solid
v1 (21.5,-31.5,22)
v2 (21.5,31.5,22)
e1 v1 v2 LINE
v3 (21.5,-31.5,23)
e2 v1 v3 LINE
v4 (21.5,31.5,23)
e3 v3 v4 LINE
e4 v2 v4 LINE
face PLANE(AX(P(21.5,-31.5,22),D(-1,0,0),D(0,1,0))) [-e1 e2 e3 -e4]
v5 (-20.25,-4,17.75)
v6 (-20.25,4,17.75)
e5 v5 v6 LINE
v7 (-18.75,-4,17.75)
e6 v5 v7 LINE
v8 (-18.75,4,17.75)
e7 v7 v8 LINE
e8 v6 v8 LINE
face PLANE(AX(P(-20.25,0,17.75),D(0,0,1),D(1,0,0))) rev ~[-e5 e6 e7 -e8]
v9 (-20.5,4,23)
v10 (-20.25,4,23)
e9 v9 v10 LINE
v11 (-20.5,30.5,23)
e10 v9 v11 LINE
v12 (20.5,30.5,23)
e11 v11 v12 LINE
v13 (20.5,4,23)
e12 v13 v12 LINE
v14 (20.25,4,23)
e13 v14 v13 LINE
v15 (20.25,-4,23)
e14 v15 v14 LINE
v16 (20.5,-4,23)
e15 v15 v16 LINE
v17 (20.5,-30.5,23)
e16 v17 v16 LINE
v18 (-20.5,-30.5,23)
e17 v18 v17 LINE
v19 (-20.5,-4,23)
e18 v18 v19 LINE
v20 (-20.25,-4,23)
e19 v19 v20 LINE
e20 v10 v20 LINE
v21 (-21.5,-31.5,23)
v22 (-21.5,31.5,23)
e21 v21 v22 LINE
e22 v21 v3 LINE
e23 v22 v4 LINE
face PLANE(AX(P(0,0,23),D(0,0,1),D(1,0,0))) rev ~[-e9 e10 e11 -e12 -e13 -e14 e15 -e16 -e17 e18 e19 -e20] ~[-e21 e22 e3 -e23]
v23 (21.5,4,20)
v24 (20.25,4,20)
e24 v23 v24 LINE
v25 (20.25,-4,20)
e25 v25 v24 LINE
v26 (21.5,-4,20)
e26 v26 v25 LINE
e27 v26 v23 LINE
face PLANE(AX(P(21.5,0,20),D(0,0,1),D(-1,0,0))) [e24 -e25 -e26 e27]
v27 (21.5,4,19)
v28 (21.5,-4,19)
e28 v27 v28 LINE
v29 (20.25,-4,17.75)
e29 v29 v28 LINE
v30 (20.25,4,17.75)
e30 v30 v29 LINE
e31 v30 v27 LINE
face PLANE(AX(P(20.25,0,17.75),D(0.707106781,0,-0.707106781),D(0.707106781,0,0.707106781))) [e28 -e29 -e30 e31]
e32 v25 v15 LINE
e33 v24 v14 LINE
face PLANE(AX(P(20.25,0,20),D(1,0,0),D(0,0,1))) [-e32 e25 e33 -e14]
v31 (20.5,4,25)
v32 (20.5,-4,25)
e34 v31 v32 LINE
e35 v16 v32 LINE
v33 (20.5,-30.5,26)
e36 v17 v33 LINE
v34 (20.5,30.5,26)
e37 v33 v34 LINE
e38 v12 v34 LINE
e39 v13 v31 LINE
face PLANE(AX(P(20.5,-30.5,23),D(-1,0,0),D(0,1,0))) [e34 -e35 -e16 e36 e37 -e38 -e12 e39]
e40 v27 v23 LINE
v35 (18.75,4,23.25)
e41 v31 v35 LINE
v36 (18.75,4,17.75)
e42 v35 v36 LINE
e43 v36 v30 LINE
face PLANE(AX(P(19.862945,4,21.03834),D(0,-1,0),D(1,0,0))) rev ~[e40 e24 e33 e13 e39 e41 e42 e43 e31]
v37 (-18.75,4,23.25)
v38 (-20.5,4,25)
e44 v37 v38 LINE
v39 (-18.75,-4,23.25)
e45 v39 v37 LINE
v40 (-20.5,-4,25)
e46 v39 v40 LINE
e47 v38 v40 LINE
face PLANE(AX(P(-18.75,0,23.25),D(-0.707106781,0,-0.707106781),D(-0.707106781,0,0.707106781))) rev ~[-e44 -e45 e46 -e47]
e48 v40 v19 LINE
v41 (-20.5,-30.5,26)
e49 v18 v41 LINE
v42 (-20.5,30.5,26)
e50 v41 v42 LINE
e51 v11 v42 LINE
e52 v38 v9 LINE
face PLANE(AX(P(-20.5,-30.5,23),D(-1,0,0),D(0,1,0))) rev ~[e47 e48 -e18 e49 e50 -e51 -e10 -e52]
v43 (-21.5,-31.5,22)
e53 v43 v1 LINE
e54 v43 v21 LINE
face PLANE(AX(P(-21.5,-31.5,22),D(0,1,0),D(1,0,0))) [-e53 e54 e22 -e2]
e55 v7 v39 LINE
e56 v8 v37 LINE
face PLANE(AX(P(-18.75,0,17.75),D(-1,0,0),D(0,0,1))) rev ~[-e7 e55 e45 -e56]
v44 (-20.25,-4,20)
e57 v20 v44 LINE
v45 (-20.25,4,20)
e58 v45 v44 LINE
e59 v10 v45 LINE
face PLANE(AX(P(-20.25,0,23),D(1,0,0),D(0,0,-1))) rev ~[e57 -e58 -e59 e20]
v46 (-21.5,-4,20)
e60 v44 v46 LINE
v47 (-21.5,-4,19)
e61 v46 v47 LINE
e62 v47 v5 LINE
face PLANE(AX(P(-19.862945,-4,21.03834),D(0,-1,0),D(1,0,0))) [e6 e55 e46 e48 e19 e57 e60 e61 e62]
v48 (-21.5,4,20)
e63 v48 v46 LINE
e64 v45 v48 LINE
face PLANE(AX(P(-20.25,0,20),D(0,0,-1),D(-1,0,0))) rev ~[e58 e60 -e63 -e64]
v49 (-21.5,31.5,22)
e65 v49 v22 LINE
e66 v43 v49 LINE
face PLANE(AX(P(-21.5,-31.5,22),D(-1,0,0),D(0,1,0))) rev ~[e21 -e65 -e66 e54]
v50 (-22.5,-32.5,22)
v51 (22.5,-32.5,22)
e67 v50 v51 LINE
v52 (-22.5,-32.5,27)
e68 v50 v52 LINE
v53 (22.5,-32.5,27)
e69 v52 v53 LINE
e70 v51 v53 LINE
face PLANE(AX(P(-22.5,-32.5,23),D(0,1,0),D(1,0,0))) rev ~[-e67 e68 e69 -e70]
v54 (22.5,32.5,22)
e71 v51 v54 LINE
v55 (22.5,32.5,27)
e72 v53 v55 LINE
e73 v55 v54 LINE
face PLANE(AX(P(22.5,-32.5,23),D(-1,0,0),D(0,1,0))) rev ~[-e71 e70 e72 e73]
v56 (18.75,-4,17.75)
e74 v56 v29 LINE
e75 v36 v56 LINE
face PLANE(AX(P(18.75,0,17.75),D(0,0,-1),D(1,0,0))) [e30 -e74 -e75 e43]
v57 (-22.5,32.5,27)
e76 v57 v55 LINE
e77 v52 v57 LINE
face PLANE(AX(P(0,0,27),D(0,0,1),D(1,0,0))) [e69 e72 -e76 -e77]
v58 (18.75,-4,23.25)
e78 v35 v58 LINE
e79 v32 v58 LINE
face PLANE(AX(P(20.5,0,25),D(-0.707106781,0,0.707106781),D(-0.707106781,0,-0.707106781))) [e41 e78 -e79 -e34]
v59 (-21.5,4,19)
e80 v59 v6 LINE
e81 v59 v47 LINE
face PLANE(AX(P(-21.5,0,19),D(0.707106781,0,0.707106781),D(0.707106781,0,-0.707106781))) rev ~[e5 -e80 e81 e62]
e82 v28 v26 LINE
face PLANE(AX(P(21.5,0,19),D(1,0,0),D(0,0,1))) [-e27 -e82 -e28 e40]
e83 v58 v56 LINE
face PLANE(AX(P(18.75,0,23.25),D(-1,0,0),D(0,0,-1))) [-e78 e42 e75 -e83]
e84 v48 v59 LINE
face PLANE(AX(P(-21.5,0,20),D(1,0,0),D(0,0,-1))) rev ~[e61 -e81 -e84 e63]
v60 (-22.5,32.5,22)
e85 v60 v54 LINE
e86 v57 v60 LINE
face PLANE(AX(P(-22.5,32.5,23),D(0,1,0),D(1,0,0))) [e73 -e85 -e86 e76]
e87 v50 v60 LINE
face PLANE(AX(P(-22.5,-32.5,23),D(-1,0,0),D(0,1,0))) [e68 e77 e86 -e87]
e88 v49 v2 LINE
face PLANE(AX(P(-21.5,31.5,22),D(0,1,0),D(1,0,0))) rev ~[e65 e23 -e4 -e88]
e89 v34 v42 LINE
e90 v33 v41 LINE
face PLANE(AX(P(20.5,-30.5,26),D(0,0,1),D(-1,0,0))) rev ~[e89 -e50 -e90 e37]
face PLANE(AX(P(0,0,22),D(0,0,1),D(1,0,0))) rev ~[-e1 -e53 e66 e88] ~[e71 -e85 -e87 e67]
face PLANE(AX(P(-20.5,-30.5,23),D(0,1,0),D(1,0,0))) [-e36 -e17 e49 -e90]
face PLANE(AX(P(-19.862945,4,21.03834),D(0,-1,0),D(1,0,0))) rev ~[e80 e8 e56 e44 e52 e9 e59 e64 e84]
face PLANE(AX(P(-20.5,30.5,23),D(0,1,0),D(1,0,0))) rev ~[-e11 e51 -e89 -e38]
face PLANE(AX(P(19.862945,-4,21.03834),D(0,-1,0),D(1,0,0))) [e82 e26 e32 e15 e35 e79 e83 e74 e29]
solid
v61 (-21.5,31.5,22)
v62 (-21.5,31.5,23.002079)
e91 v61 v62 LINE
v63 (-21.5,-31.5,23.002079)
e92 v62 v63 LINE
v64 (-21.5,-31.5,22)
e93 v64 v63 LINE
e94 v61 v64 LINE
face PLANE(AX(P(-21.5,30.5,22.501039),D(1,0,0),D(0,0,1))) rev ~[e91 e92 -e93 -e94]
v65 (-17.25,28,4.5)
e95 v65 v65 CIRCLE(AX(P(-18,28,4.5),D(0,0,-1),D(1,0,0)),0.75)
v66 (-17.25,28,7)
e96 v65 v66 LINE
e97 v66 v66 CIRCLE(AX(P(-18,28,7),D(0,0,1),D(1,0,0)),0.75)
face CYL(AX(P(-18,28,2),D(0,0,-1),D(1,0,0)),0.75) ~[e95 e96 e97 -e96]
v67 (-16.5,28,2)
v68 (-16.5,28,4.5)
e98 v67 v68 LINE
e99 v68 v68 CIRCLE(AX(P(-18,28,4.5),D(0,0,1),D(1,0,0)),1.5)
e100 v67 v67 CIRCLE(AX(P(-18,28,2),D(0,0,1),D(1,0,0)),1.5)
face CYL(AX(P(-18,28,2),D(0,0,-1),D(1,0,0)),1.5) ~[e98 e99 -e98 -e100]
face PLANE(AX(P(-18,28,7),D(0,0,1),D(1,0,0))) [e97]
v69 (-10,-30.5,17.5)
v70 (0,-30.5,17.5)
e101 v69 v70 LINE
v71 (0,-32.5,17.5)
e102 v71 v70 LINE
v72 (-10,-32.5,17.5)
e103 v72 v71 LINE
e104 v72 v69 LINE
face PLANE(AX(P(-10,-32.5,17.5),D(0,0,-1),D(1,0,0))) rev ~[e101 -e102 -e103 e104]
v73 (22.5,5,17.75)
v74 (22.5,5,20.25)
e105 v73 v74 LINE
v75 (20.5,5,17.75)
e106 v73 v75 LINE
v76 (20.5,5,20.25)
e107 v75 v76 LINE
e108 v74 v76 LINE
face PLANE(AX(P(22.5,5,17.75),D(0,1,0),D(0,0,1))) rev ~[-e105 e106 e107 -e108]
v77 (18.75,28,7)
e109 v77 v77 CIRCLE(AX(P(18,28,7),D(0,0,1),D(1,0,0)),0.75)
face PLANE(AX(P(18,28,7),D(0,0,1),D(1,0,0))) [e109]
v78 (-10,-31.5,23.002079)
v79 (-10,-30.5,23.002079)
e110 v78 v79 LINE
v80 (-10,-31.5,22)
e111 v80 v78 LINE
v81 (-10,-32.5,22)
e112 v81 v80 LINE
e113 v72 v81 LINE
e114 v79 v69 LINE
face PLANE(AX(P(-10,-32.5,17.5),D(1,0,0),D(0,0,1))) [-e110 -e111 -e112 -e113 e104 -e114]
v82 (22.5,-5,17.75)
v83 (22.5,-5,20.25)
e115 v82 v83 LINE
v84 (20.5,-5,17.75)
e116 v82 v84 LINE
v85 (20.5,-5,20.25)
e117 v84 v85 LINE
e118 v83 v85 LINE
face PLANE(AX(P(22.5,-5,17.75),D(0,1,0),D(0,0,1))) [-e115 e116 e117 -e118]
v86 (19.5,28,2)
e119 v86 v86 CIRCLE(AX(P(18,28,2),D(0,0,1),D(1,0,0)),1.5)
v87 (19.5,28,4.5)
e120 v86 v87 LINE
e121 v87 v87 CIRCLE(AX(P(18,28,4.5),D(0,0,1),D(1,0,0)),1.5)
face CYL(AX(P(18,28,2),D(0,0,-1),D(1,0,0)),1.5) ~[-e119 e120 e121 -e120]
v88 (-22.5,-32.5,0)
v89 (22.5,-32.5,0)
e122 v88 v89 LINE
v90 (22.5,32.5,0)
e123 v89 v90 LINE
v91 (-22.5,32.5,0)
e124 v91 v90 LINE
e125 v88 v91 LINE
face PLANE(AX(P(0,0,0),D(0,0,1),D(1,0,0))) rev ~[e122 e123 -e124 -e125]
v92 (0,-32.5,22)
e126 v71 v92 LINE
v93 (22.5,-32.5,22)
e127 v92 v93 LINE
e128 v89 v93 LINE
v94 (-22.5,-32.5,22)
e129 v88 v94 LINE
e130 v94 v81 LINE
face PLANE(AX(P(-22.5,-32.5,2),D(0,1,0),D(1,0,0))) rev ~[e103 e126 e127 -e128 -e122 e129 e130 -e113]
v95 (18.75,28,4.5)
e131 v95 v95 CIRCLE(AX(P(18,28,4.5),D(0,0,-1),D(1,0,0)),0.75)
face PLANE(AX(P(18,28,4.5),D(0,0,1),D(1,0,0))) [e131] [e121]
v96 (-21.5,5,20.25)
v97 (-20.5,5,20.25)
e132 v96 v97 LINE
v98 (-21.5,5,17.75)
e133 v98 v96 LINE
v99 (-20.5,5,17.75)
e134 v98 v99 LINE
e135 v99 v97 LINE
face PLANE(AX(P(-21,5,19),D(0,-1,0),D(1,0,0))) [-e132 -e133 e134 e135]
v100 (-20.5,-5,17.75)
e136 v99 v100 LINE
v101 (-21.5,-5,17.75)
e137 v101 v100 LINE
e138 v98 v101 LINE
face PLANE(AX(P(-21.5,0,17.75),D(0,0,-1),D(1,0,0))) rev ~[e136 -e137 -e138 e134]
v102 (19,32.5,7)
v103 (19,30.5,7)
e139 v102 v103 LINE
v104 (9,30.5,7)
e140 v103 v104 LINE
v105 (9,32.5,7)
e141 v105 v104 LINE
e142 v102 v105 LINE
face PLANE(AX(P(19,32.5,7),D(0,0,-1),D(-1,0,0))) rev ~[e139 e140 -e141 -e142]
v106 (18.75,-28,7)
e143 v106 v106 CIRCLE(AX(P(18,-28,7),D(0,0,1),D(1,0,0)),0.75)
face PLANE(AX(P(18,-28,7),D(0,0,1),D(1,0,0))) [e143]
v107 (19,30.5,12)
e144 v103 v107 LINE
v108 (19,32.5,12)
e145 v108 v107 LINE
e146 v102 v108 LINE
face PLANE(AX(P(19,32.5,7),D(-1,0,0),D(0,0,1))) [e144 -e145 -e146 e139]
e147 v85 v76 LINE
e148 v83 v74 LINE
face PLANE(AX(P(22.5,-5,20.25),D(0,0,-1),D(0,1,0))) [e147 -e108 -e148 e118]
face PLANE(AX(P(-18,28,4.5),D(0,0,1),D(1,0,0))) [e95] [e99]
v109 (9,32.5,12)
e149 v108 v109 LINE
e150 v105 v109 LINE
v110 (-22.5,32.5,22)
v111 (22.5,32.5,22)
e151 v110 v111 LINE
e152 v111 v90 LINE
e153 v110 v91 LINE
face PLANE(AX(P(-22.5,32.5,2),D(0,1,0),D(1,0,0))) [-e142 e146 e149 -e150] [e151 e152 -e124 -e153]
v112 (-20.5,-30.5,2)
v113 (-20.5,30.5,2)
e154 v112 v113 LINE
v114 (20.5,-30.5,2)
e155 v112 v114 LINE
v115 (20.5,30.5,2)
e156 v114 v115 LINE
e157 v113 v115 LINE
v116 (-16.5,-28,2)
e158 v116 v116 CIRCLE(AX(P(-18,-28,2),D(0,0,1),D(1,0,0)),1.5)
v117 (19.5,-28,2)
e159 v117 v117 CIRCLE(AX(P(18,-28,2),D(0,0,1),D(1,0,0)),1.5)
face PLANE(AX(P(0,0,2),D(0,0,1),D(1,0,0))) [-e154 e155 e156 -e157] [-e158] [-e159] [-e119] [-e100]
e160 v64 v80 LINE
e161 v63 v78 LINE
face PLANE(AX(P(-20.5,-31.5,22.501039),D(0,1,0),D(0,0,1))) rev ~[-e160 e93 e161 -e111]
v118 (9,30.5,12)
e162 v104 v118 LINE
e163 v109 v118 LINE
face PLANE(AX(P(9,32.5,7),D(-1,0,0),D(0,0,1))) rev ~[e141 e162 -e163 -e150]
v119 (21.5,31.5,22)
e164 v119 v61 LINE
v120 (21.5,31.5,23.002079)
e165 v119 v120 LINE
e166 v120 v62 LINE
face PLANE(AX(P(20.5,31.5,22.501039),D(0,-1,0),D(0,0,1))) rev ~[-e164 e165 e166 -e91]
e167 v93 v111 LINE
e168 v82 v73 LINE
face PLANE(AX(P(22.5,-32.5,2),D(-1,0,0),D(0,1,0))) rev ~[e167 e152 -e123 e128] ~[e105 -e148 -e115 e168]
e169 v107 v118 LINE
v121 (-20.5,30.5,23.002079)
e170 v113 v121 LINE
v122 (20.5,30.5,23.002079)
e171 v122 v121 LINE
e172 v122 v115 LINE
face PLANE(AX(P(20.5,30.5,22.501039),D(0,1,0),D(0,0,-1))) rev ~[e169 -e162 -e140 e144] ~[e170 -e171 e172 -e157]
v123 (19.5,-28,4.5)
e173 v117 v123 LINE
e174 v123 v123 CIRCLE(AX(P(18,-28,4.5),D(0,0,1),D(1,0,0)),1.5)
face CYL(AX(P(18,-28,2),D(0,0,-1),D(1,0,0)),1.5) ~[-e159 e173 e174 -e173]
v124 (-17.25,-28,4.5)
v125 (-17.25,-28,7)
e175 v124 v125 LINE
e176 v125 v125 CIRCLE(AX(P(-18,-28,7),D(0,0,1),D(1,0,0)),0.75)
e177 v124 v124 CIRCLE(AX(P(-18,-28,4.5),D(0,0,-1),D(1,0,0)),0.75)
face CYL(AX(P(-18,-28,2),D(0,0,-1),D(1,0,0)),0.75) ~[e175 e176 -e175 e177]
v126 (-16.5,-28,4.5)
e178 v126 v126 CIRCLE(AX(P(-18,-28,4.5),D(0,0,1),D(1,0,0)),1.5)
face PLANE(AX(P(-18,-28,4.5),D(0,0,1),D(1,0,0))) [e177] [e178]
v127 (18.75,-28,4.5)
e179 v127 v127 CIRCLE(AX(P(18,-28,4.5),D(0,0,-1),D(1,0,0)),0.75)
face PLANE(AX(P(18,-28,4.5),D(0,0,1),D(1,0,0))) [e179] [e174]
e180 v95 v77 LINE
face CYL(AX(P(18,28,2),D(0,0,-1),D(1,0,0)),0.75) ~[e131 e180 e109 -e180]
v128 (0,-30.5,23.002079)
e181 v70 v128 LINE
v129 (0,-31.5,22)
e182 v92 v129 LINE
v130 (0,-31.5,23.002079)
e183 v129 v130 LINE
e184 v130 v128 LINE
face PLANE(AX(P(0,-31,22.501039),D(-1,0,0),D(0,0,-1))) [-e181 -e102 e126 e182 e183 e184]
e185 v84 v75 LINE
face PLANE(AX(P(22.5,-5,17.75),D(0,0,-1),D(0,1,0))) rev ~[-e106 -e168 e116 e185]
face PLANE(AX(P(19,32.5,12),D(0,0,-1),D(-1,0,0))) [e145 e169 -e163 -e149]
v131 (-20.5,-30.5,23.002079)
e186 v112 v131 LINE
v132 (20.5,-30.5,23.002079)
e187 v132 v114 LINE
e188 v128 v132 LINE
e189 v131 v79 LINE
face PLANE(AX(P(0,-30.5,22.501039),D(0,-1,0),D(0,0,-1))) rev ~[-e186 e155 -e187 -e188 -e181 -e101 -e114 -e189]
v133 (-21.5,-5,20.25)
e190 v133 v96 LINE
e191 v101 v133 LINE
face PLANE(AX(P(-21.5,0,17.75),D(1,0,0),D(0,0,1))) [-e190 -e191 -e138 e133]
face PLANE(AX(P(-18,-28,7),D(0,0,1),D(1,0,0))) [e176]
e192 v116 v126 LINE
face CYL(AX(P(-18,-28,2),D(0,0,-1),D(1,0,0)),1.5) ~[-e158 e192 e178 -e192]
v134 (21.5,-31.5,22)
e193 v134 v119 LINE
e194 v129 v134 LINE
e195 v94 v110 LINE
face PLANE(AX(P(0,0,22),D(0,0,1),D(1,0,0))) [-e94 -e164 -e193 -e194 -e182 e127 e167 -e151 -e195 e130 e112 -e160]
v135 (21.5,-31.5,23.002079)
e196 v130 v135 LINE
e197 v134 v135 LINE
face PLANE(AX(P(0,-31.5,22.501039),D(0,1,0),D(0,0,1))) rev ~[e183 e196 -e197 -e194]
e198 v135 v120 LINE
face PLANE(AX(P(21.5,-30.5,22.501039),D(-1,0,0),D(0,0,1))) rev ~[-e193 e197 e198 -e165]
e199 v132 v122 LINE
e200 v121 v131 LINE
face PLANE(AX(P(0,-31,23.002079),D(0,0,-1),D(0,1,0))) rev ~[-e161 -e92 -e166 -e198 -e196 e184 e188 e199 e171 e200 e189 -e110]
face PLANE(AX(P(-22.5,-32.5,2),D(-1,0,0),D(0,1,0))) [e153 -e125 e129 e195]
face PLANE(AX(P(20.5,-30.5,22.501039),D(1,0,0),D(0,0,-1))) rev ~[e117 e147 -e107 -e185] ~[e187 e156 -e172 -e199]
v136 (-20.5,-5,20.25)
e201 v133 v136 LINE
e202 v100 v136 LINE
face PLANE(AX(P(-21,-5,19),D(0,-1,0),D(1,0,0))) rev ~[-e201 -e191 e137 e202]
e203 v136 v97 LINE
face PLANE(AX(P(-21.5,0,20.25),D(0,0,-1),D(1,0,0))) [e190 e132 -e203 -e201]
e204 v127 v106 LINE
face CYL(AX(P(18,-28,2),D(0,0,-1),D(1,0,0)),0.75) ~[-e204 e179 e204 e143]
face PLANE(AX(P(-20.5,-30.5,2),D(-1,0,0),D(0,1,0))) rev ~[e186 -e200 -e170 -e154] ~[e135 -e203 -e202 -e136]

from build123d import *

# Parameters (mm, degrees)
F0_W      = 45
F0_H      = 65
F1_DEPTH  = 2
F2_W      = 45
F2_H      = 65
F2_W_2    = 41
F2_H_2    = 61
F3_DEPTH  = 20
F4_R      = 0.75
F5_DEPTH  = 5
F6_R      = 1.5
F7_DEPTH  = 2.5
F8_W      = 10
F8_H      = 4.5
F9_DEPTH  = 2
F10_W     = 10
F10_H     = 5
F11_DEPTH = 2
F12_W     = 1
F12_H     = 1.0020786701
F14_W     = 45
F14_H     = 65
F14_W_2   = 43
F14_H_2   = 63
F15_DEPTH = 1
F16_W     = 45
F16_H     = 65
F16_W_2   = 41
F16_H_2   = 61
F17_DEPTH = 4
F18_W     = 41
F18_H     = 1
F19_DEPTH = 61
F21_DEPTH = 4
F22_W     = 1
F22_H     = 2.5
F23_DEPTH = 5
F24_W     = 10
F24_H     = 2.5
F25_DEPTH = 2


with BuildPart() as f1:
    # F0 (on Top) → F1 (new body)
    with BuildSketch(Plane.XY):
        Rectangle(F0_W, F0_H)
    extrude(amount=F1_DEPTH)

    # F2 (on face) → F3 (join)
    with BuildSketch(Plane.XY.offset(2)):
        Rectangle(F2_W, F2_H)
        Rectangle(F2_W_2, F2_H_2, mode=Mode.SUBTRACT)
    extrude(amount=F3_DEPTH)

    # F4 (on face) → F5 (join)
    with BuildSketch(Plane.XY.offset(2)):
        with Locations((-18, 28)):
            Circle(F4_R)
        with Locations((-18, -28)):
            Circle(F4_R)
        with Locations((18, 28)):
            Circle(F4_R)
        with Locations((18, -28)):
            Circle(F4_R)
    extrude(amount=F5_DEPTH)

    # F6 (on face) → F7 (join)
    with BuildSketch(Plane.XY.offset(2)):
        with Locations((-18, 28)):
            Circle(F6_R)
        with Locations((-18, -28)):
            Circle(F6_R)
        with Locations((18, 28)):
            Circle(F6_R)
        with Locations((18, -28)):
            Circle(F6_R)
    extrude(amount=F7_DEPTH)

    # F8 (on face) → F9 (cut, through all)
    with BuildSketch(Plane.XZ.offset(32.5)):
        with Locations((-5, 19.75)):
            Rectangle(F8_W, F8_H)
    extrude(amount=-F9_DEPTH, mode=Mode.SUBTRACT)

    # F10 (on face) → F11 (cut, through all)
    with BuildSketch(Plane(origin=(0, 32.5, 0), x_dir=(-1, 0, 0), z_dir=(0, 1, 0))):
        with Locations((-14, 9.5)):
            Rectangle(F10_W, F10_H)
    extrude(amount=-F11_DEPTH, mode=Mode.SUBTRACT)

    # F13: sweep along a path in F13_path
    with BuildLine(Plane(origin=(-20.5, 30.5, 22), x_dir=(0, -1, 0), z_dir=(0, 0, -1))) as f13_path:
        Line((61, -20.5), (61, -41))
        Line((61, -41), (0, -41))
        Line((0, -41), (0, 0))
        Line((0, 0), (61, 0))
        Line((61, 0), (61, -10.5))
    # F12 (on face) → F13 (sweep)
    with BuildSketch(Plane(origin=(0, -30.5, 0), x_dir=(-1, 0, 0), z_dir=(0, 1, 0))):
        with Locations((21, 22.5010393351)):
            Rectangle(F12_W, F12_H)
    sweep(path=f13_path.line, transition=Transition.RIGHT)

    # F22 (on Front) → F23 (cut, symmetric)
    with BuildSketch(Plane.XZ):
        with Locations((-21, 19)):
            Rectangle(F22_W, F22_H)
    extrude(amount=F23_DEPTH, both=True, mode=Mode.SUBTRACT)

    # F24 (on face) → F25 (cut)
    with BuildSketch(Plane.YZ.offset(22.5)):
        with Locations((0, 19)):
            Rectangle(F24_W, F24_H)
    extrude(amount=-F25_DEPTH, mode=Mode.SUBTRACT)


with BuildPart() as f15:
    # F14 (on face) → F15 (new body)
    with BuildSketch(Plane.XY.offset(22)):
        Rectangle(F14_W, F14_H)
        Rectangle(F14_W_2, F14_H_2, mode=Mode.SUBTRACT)
    extrude(amount=F15_DEPTH)

    # F16 (on face) → F17 (join)
    with BuildSketch(Plane.XY.offset(23)):
        Rectangle(F16_W, F16_H)
        Rectangle(F16_W_2, F16_H_2, mode=Mode.SUBTRACT)
    extrude(amount=F17_DEPTH)

    # F18 (on face) → F19 (join, through all)
    with BuildSketch(Plane(origin=(0, -30.5, 0), x_dir=(-1, 0, 0), z_dir=(0, 1, 0))):
        with Locations((0, 26.5)):
            Rectangle(F18_W, F18_H)
    extrude(amount=F19_DEPTH)

    # F20 (on Front) → F21 (join, symmetric)
    with BuildSketch(Plane.XZ):
        Polygon((-18.75, 23.25), (-20.5, 25), (-20.5, 23), (-20.25, 23), (-20.25, 20), (-21.5, 20), (-21.5, 19), (-20.25, 17.75), (-18.75, 17.75), align=None)
        Polygon((20.25, 23), (20.5, 23), (20.5, 25), (18.75, 23.25), (18.75, 17.75), (20.25, 17.75), (21.5, 19), (21.5, 20), (20.25, 20), align=None)
    extrude(amount=F21_DEPTH, both=True)


solid = Compound([f1.part, f15.part])
